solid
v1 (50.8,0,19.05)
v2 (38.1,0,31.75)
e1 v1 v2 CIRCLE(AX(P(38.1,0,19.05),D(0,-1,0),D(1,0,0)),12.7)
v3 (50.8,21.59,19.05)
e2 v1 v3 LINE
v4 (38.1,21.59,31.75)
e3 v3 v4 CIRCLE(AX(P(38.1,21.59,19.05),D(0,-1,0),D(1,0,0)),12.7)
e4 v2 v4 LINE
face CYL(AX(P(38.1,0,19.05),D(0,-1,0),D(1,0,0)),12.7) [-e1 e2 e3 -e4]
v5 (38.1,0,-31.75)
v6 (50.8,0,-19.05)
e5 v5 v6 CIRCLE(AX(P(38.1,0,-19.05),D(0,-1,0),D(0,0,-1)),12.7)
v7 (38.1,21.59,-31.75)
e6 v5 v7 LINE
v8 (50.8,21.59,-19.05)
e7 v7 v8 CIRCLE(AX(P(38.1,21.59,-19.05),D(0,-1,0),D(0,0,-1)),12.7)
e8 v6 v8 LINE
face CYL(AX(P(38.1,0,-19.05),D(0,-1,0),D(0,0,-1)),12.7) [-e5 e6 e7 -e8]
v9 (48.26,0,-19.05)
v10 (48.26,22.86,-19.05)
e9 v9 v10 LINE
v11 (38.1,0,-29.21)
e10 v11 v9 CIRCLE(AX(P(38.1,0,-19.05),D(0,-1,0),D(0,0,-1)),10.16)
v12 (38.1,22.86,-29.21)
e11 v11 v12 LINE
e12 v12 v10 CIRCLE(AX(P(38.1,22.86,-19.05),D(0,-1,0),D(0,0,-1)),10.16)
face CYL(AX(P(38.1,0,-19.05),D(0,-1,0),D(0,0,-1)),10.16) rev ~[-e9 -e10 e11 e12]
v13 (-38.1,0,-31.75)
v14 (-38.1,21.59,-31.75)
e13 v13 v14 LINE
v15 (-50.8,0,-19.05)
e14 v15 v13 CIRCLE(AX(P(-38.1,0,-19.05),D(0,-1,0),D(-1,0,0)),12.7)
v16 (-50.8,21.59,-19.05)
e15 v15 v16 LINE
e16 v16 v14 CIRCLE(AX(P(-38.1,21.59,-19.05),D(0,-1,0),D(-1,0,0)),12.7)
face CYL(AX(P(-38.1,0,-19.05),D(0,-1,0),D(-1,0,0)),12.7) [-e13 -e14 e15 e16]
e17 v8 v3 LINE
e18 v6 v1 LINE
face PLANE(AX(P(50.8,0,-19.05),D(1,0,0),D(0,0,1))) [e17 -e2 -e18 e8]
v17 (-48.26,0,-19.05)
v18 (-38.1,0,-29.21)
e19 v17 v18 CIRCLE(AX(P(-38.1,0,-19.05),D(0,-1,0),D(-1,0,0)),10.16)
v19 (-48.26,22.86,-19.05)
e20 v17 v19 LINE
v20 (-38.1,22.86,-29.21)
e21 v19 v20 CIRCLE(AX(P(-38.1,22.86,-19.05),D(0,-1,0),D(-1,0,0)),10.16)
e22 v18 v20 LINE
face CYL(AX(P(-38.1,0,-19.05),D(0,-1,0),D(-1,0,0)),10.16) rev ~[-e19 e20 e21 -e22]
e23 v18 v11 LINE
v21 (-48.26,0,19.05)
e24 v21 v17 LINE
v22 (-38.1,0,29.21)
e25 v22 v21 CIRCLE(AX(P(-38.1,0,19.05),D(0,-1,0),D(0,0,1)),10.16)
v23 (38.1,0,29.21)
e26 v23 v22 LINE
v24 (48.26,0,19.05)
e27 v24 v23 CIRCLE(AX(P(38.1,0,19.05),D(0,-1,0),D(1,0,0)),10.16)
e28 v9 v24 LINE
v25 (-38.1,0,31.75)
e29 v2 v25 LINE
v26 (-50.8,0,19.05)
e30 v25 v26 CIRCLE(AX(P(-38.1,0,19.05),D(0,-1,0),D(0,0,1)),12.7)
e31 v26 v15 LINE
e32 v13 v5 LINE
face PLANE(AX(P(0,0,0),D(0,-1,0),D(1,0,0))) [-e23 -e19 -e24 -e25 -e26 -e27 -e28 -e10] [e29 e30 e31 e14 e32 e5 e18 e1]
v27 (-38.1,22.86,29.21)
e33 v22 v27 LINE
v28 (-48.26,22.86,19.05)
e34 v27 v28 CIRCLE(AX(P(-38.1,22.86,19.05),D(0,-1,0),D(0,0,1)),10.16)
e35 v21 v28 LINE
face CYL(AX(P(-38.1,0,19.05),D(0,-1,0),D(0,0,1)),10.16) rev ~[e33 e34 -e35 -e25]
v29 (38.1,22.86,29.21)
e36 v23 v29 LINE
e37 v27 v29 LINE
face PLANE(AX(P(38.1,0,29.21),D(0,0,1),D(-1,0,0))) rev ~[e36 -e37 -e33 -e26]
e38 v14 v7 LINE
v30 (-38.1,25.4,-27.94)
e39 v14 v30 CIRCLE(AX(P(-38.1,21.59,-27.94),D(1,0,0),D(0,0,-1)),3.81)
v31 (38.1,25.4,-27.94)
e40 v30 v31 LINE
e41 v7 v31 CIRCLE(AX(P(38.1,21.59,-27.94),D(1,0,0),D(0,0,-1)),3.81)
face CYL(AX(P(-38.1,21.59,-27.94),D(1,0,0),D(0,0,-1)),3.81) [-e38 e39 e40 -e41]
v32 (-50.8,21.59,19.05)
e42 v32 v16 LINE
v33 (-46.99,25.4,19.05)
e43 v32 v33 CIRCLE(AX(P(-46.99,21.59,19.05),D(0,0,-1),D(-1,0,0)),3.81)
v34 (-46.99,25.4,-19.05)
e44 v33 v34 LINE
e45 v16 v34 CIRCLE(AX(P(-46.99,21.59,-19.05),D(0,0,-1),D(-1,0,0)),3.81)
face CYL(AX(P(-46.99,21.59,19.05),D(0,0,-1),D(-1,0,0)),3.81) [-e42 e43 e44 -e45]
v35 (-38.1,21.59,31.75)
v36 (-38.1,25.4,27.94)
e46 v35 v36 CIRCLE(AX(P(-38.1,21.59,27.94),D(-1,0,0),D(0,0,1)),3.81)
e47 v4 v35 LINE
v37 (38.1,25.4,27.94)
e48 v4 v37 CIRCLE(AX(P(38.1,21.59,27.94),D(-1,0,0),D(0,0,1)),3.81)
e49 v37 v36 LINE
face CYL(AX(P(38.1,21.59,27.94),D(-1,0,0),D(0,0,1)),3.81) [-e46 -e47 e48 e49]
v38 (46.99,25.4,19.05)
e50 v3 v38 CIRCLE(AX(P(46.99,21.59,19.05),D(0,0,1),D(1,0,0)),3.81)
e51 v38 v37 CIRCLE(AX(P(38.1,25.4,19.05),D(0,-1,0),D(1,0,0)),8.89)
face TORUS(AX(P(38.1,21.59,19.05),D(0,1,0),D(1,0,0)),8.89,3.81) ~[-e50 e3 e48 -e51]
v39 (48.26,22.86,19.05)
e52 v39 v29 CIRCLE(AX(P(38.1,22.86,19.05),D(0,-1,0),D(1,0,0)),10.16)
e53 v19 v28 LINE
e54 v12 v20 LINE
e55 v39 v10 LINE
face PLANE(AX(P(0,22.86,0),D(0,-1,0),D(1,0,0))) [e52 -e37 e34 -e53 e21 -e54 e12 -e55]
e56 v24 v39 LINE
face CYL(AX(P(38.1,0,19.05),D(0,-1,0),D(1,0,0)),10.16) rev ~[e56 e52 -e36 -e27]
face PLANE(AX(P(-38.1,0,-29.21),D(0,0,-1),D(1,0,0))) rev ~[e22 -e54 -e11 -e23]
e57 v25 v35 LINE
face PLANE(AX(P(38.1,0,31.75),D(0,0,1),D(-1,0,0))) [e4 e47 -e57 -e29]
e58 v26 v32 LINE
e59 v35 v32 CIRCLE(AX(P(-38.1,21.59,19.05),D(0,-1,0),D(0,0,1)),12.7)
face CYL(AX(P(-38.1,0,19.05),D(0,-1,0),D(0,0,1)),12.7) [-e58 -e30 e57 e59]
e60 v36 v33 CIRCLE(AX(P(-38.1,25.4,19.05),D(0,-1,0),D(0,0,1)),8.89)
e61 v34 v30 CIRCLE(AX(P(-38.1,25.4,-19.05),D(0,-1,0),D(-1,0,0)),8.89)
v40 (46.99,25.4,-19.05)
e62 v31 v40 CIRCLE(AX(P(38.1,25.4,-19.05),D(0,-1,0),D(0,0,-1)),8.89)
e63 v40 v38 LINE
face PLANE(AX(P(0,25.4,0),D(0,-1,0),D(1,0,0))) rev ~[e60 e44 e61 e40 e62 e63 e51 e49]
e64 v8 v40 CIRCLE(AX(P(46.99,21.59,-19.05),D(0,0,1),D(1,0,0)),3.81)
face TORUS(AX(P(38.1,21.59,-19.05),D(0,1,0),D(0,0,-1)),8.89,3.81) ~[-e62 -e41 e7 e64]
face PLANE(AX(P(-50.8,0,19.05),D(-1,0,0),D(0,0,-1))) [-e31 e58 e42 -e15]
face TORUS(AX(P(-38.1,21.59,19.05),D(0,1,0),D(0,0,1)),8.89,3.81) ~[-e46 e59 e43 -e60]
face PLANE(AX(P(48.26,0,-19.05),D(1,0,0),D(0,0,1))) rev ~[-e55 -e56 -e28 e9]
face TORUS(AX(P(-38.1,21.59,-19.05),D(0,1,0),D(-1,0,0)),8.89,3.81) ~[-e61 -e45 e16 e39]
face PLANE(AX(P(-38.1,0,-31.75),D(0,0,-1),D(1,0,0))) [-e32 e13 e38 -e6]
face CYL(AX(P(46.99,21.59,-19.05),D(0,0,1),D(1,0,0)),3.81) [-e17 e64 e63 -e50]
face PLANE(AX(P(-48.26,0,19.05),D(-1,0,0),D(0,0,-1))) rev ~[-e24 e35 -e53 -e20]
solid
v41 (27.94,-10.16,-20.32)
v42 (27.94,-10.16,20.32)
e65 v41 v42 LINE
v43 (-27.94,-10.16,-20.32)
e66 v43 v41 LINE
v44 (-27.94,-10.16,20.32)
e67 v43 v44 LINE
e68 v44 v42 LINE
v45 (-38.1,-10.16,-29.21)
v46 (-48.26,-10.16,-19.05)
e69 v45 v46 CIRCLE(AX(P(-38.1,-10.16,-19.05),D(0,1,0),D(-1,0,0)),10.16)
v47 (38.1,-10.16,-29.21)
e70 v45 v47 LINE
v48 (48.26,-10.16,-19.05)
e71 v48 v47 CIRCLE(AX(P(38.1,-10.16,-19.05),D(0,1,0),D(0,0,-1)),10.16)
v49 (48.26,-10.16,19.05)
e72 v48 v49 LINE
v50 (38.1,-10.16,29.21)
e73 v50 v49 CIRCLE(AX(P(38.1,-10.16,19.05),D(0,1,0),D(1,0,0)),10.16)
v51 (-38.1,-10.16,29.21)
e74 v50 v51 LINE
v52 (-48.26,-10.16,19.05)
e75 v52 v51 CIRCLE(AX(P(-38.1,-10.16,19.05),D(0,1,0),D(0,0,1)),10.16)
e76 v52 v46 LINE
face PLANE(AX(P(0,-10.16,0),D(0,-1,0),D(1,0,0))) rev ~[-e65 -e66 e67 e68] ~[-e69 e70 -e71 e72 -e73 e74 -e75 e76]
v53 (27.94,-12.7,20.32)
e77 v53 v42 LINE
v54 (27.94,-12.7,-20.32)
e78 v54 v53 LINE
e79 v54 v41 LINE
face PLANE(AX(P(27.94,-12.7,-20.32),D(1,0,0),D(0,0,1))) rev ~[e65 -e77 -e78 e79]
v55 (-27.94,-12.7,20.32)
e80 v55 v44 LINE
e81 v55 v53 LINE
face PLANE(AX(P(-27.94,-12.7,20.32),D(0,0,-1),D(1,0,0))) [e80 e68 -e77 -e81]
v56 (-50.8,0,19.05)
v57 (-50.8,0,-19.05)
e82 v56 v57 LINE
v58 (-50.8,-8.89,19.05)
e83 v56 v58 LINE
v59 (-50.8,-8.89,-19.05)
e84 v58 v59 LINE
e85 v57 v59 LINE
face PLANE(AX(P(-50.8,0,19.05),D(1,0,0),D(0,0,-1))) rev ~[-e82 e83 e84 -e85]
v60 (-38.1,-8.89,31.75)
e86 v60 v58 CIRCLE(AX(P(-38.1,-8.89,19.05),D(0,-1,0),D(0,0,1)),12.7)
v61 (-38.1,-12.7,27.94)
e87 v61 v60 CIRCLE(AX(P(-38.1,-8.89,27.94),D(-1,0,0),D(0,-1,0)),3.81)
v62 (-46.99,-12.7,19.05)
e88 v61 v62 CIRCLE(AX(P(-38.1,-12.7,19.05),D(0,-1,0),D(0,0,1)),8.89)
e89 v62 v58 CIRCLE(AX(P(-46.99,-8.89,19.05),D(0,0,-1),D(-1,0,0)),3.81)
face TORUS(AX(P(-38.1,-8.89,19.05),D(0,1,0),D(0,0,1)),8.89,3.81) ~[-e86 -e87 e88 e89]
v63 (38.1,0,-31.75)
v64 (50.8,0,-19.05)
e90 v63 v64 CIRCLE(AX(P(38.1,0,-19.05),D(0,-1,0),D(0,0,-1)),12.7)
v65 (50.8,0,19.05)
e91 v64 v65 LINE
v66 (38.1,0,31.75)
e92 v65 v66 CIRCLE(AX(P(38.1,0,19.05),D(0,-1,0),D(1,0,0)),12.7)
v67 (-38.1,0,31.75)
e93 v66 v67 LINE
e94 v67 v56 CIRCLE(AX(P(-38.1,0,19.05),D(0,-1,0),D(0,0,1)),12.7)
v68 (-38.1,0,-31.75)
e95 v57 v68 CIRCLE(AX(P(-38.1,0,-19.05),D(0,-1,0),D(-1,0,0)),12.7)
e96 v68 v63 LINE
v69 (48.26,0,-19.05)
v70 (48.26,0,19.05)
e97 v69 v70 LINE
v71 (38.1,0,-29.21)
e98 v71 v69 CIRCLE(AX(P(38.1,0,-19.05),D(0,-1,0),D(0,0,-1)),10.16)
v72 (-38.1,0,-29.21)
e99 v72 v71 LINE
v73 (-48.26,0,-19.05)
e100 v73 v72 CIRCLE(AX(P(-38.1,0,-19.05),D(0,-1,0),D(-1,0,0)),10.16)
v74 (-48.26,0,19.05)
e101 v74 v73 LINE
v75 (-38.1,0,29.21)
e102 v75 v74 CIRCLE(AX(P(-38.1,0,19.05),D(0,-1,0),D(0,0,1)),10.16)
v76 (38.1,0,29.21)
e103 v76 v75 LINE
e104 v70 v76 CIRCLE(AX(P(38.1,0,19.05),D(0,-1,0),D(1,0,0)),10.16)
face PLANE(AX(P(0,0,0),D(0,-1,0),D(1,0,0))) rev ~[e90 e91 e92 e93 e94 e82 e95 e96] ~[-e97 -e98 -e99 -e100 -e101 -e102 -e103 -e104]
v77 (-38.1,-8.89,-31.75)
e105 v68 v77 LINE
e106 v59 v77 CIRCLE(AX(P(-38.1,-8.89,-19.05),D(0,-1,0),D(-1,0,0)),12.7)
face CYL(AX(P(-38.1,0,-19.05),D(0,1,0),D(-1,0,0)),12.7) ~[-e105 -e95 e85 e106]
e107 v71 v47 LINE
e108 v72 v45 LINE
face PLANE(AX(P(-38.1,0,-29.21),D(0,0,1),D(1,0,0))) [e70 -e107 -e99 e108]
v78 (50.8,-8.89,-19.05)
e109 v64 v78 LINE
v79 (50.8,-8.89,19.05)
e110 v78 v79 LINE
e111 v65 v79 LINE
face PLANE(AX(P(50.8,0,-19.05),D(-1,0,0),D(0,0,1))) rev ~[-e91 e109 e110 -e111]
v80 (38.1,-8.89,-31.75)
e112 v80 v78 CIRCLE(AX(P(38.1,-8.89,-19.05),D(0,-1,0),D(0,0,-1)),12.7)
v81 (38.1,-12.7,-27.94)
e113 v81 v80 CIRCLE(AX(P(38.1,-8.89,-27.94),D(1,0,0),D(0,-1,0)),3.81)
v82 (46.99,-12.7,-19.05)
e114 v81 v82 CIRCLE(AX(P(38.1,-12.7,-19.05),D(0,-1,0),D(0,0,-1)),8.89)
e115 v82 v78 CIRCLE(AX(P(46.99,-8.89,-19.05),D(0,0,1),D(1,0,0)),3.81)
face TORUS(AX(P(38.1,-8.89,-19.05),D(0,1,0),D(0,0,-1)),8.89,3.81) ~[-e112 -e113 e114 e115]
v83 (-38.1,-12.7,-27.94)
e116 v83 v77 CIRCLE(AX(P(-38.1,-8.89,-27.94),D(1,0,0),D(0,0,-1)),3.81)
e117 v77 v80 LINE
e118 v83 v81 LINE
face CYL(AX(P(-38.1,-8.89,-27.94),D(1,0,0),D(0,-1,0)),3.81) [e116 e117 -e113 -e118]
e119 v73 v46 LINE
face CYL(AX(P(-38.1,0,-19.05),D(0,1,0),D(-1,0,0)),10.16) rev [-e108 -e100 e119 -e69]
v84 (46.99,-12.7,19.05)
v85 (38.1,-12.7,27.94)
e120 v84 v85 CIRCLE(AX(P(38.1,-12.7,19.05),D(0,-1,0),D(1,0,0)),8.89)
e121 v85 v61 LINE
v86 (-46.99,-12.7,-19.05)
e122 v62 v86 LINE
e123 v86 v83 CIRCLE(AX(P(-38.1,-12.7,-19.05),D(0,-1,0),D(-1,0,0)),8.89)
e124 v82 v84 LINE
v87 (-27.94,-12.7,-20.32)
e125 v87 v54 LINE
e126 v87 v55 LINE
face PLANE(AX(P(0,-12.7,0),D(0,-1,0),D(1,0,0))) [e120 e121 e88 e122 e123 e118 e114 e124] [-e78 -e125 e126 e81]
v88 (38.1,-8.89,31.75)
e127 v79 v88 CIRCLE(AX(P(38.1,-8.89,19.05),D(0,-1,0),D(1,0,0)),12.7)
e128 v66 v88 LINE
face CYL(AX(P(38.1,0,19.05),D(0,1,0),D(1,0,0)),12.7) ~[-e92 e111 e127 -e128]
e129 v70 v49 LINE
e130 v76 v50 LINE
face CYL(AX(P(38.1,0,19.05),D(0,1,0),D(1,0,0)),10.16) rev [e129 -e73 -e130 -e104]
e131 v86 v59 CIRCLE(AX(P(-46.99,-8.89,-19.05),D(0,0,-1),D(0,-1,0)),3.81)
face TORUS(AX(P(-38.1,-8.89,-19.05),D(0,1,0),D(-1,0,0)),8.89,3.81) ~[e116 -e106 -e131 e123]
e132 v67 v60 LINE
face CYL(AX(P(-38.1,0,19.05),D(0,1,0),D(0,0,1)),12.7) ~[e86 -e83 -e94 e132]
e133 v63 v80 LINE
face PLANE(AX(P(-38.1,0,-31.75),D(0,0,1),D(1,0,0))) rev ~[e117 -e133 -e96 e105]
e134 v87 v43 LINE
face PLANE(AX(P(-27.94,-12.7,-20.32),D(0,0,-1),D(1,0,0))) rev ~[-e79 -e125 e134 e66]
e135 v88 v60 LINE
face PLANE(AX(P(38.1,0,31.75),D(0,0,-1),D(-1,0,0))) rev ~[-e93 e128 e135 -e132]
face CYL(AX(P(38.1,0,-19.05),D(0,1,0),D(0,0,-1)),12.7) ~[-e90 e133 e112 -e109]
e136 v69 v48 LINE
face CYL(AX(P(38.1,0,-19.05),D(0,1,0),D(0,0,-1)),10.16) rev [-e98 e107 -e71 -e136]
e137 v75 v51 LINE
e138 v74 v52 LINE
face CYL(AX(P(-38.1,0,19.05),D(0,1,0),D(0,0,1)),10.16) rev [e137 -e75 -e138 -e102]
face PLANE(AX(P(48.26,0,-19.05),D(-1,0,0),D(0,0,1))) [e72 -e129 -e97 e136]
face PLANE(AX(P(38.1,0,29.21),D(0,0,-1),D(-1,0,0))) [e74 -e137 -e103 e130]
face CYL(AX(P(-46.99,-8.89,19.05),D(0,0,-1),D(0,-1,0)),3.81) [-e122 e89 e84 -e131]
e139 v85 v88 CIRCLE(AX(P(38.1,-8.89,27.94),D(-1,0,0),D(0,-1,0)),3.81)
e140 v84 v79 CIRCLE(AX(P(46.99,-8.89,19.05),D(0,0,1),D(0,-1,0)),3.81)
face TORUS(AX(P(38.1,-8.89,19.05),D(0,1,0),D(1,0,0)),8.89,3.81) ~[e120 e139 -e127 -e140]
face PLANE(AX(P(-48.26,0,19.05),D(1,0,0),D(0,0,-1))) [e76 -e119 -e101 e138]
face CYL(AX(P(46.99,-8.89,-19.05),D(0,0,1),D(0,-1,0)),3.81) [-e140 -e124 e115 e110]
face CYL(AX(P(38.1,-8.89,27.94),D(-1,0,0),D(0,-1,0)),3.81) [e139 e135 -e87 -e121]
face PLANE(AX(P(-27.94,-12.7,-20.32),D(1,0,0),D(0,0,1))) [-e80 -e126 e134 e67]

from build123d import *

# Parameters (mm, degrees)
F1_DEPTH = 12.7
F3_DEPTH = 25.4
F4_T     = -2.54
F4_2_T   = -2.54
F2_W     = 55.88
F2_H     = 40.64
F5_DEPTH = 38.101
F6_R     = 3.81
F6_2_R   = 3.81


with BuildPart() as f1:
    # F0 (on Front) → F1 (new body)
    with BuildSketch(Plane.XZ):
        with BuildLine():
            Line((-38.1, -31.75), (38.1, -31.75))
            ThreePointArc((38.1, -31.75), (47.0802561211, -28.0302561211), (50.8, -19.05))
            Line((50.8, -19.05), (50.8, 19.05))
            ThreePointArc((50.8, 19.05), (47.0802561211, 28.0302561211), (38.1, 31.75))
            Line((38.1, 31.75), (-38.1, 31.75))
            ThreePointArc((-38.1, 31.75), (-47.0802561211, 28.0302561211), (-50.8, 19.05))
            Line((-50.8, 19.05), (-50.8, -19.05))
            ThreePointArc((-50.8, -19.05), (-47.0802561211, -28.0302561211), (-38.1, -31.75))
        make_face()
    extrude(amount=F1_DEPTH)

    # F4
    f4_openings = [f1.faces().sort_by_distance(p)[0] for p in [
        (0, 0, 0),
    ]]
    offset(amount=F4_T, openings=f4_openings)

    # F2 (on face) → F5 (cut, through all)
    with BuildSketch(Plane.XZ.offset(12.7)):
        Rectangle(F2_W, F2_H)
    extrude(amount=-F5_DEPTH, mode=Mode.SUBTRACT)

    # F6
    f6_edges = [f1.edges().sort_by_distance(p)[0] for p in [
        (0, -12.7, 31.75),
        (0, -12.7, -31.75),
        (-47.080256, -12.7, -28.030256),
        (47.080256, -12.7, -28.030256),
        (-50.8, -12.7, 0),
        (50.8, -12.7, 0),
        (-47.080256, -12.7, 28.030256),
        (47.080256, -12.7, 28.030256),
    ]]
    fillet(f6_edges, radius=F6_R)


with BuildPart() as f3:
    # F0 (on Front) → F3 (new body)
    with BuildSketch(Plane.XZ):
        with BuildLine():
            Line((-38.1, -31.75), (38.1, -31.75))
            ThreePointArc((38.1, -31.75), (47.0802561211, -28.0302561211), (50.8, -19.05))
            Line((50.8, -19.05), (50.8, 19.05))
            ThreePointArc((50.8, 19.05), (47.0802561211, 28.0302561211), (38.1, 31.75))
            Line((38.1, 31.75), (-38.1, 31.75))
            ThreePointArc((-38.1, 31.75), (-47.0802561211, 28.0302561211), (-50.8, 19.05))
            Line((-50.8, 19.05), (-50.8, -19.05))
            ThreePointArc((-50.8, -19.05), (-47.0802561211, -28.0302561211), (-38.1, -31.75))
        make_face()
    extrude(amount=-F3_DEPTH)

    # F4#2
    f4_2_openings = [f3.faces().sort_by_distance(p)[0] for p in [
        (0, 0, 0),
    ]]
    offset(amount=F4_2_T, openings=f4_2_openings)

    # F6#2
    f6_2_edges = [f3.edges().sort_by_distance(p)[0] for p in [
        (0, 25.4, 31.75),
        (0, 25.4, -31.75),
        (47.080256, 25.4, -28.030256),
        (50.8, 25.4, 0),
        (47.080256, 25.4, 28.030256),
        (-47.080256, 25.4, 28.030256),
        (-50.8, 25.4, 0),
        (-47.080256, 25.4, -28.030256),
    ]]
    fillet(f6_2_edges, radius=F6_2_R)


solid = Compound([f1.part, f3.part])
